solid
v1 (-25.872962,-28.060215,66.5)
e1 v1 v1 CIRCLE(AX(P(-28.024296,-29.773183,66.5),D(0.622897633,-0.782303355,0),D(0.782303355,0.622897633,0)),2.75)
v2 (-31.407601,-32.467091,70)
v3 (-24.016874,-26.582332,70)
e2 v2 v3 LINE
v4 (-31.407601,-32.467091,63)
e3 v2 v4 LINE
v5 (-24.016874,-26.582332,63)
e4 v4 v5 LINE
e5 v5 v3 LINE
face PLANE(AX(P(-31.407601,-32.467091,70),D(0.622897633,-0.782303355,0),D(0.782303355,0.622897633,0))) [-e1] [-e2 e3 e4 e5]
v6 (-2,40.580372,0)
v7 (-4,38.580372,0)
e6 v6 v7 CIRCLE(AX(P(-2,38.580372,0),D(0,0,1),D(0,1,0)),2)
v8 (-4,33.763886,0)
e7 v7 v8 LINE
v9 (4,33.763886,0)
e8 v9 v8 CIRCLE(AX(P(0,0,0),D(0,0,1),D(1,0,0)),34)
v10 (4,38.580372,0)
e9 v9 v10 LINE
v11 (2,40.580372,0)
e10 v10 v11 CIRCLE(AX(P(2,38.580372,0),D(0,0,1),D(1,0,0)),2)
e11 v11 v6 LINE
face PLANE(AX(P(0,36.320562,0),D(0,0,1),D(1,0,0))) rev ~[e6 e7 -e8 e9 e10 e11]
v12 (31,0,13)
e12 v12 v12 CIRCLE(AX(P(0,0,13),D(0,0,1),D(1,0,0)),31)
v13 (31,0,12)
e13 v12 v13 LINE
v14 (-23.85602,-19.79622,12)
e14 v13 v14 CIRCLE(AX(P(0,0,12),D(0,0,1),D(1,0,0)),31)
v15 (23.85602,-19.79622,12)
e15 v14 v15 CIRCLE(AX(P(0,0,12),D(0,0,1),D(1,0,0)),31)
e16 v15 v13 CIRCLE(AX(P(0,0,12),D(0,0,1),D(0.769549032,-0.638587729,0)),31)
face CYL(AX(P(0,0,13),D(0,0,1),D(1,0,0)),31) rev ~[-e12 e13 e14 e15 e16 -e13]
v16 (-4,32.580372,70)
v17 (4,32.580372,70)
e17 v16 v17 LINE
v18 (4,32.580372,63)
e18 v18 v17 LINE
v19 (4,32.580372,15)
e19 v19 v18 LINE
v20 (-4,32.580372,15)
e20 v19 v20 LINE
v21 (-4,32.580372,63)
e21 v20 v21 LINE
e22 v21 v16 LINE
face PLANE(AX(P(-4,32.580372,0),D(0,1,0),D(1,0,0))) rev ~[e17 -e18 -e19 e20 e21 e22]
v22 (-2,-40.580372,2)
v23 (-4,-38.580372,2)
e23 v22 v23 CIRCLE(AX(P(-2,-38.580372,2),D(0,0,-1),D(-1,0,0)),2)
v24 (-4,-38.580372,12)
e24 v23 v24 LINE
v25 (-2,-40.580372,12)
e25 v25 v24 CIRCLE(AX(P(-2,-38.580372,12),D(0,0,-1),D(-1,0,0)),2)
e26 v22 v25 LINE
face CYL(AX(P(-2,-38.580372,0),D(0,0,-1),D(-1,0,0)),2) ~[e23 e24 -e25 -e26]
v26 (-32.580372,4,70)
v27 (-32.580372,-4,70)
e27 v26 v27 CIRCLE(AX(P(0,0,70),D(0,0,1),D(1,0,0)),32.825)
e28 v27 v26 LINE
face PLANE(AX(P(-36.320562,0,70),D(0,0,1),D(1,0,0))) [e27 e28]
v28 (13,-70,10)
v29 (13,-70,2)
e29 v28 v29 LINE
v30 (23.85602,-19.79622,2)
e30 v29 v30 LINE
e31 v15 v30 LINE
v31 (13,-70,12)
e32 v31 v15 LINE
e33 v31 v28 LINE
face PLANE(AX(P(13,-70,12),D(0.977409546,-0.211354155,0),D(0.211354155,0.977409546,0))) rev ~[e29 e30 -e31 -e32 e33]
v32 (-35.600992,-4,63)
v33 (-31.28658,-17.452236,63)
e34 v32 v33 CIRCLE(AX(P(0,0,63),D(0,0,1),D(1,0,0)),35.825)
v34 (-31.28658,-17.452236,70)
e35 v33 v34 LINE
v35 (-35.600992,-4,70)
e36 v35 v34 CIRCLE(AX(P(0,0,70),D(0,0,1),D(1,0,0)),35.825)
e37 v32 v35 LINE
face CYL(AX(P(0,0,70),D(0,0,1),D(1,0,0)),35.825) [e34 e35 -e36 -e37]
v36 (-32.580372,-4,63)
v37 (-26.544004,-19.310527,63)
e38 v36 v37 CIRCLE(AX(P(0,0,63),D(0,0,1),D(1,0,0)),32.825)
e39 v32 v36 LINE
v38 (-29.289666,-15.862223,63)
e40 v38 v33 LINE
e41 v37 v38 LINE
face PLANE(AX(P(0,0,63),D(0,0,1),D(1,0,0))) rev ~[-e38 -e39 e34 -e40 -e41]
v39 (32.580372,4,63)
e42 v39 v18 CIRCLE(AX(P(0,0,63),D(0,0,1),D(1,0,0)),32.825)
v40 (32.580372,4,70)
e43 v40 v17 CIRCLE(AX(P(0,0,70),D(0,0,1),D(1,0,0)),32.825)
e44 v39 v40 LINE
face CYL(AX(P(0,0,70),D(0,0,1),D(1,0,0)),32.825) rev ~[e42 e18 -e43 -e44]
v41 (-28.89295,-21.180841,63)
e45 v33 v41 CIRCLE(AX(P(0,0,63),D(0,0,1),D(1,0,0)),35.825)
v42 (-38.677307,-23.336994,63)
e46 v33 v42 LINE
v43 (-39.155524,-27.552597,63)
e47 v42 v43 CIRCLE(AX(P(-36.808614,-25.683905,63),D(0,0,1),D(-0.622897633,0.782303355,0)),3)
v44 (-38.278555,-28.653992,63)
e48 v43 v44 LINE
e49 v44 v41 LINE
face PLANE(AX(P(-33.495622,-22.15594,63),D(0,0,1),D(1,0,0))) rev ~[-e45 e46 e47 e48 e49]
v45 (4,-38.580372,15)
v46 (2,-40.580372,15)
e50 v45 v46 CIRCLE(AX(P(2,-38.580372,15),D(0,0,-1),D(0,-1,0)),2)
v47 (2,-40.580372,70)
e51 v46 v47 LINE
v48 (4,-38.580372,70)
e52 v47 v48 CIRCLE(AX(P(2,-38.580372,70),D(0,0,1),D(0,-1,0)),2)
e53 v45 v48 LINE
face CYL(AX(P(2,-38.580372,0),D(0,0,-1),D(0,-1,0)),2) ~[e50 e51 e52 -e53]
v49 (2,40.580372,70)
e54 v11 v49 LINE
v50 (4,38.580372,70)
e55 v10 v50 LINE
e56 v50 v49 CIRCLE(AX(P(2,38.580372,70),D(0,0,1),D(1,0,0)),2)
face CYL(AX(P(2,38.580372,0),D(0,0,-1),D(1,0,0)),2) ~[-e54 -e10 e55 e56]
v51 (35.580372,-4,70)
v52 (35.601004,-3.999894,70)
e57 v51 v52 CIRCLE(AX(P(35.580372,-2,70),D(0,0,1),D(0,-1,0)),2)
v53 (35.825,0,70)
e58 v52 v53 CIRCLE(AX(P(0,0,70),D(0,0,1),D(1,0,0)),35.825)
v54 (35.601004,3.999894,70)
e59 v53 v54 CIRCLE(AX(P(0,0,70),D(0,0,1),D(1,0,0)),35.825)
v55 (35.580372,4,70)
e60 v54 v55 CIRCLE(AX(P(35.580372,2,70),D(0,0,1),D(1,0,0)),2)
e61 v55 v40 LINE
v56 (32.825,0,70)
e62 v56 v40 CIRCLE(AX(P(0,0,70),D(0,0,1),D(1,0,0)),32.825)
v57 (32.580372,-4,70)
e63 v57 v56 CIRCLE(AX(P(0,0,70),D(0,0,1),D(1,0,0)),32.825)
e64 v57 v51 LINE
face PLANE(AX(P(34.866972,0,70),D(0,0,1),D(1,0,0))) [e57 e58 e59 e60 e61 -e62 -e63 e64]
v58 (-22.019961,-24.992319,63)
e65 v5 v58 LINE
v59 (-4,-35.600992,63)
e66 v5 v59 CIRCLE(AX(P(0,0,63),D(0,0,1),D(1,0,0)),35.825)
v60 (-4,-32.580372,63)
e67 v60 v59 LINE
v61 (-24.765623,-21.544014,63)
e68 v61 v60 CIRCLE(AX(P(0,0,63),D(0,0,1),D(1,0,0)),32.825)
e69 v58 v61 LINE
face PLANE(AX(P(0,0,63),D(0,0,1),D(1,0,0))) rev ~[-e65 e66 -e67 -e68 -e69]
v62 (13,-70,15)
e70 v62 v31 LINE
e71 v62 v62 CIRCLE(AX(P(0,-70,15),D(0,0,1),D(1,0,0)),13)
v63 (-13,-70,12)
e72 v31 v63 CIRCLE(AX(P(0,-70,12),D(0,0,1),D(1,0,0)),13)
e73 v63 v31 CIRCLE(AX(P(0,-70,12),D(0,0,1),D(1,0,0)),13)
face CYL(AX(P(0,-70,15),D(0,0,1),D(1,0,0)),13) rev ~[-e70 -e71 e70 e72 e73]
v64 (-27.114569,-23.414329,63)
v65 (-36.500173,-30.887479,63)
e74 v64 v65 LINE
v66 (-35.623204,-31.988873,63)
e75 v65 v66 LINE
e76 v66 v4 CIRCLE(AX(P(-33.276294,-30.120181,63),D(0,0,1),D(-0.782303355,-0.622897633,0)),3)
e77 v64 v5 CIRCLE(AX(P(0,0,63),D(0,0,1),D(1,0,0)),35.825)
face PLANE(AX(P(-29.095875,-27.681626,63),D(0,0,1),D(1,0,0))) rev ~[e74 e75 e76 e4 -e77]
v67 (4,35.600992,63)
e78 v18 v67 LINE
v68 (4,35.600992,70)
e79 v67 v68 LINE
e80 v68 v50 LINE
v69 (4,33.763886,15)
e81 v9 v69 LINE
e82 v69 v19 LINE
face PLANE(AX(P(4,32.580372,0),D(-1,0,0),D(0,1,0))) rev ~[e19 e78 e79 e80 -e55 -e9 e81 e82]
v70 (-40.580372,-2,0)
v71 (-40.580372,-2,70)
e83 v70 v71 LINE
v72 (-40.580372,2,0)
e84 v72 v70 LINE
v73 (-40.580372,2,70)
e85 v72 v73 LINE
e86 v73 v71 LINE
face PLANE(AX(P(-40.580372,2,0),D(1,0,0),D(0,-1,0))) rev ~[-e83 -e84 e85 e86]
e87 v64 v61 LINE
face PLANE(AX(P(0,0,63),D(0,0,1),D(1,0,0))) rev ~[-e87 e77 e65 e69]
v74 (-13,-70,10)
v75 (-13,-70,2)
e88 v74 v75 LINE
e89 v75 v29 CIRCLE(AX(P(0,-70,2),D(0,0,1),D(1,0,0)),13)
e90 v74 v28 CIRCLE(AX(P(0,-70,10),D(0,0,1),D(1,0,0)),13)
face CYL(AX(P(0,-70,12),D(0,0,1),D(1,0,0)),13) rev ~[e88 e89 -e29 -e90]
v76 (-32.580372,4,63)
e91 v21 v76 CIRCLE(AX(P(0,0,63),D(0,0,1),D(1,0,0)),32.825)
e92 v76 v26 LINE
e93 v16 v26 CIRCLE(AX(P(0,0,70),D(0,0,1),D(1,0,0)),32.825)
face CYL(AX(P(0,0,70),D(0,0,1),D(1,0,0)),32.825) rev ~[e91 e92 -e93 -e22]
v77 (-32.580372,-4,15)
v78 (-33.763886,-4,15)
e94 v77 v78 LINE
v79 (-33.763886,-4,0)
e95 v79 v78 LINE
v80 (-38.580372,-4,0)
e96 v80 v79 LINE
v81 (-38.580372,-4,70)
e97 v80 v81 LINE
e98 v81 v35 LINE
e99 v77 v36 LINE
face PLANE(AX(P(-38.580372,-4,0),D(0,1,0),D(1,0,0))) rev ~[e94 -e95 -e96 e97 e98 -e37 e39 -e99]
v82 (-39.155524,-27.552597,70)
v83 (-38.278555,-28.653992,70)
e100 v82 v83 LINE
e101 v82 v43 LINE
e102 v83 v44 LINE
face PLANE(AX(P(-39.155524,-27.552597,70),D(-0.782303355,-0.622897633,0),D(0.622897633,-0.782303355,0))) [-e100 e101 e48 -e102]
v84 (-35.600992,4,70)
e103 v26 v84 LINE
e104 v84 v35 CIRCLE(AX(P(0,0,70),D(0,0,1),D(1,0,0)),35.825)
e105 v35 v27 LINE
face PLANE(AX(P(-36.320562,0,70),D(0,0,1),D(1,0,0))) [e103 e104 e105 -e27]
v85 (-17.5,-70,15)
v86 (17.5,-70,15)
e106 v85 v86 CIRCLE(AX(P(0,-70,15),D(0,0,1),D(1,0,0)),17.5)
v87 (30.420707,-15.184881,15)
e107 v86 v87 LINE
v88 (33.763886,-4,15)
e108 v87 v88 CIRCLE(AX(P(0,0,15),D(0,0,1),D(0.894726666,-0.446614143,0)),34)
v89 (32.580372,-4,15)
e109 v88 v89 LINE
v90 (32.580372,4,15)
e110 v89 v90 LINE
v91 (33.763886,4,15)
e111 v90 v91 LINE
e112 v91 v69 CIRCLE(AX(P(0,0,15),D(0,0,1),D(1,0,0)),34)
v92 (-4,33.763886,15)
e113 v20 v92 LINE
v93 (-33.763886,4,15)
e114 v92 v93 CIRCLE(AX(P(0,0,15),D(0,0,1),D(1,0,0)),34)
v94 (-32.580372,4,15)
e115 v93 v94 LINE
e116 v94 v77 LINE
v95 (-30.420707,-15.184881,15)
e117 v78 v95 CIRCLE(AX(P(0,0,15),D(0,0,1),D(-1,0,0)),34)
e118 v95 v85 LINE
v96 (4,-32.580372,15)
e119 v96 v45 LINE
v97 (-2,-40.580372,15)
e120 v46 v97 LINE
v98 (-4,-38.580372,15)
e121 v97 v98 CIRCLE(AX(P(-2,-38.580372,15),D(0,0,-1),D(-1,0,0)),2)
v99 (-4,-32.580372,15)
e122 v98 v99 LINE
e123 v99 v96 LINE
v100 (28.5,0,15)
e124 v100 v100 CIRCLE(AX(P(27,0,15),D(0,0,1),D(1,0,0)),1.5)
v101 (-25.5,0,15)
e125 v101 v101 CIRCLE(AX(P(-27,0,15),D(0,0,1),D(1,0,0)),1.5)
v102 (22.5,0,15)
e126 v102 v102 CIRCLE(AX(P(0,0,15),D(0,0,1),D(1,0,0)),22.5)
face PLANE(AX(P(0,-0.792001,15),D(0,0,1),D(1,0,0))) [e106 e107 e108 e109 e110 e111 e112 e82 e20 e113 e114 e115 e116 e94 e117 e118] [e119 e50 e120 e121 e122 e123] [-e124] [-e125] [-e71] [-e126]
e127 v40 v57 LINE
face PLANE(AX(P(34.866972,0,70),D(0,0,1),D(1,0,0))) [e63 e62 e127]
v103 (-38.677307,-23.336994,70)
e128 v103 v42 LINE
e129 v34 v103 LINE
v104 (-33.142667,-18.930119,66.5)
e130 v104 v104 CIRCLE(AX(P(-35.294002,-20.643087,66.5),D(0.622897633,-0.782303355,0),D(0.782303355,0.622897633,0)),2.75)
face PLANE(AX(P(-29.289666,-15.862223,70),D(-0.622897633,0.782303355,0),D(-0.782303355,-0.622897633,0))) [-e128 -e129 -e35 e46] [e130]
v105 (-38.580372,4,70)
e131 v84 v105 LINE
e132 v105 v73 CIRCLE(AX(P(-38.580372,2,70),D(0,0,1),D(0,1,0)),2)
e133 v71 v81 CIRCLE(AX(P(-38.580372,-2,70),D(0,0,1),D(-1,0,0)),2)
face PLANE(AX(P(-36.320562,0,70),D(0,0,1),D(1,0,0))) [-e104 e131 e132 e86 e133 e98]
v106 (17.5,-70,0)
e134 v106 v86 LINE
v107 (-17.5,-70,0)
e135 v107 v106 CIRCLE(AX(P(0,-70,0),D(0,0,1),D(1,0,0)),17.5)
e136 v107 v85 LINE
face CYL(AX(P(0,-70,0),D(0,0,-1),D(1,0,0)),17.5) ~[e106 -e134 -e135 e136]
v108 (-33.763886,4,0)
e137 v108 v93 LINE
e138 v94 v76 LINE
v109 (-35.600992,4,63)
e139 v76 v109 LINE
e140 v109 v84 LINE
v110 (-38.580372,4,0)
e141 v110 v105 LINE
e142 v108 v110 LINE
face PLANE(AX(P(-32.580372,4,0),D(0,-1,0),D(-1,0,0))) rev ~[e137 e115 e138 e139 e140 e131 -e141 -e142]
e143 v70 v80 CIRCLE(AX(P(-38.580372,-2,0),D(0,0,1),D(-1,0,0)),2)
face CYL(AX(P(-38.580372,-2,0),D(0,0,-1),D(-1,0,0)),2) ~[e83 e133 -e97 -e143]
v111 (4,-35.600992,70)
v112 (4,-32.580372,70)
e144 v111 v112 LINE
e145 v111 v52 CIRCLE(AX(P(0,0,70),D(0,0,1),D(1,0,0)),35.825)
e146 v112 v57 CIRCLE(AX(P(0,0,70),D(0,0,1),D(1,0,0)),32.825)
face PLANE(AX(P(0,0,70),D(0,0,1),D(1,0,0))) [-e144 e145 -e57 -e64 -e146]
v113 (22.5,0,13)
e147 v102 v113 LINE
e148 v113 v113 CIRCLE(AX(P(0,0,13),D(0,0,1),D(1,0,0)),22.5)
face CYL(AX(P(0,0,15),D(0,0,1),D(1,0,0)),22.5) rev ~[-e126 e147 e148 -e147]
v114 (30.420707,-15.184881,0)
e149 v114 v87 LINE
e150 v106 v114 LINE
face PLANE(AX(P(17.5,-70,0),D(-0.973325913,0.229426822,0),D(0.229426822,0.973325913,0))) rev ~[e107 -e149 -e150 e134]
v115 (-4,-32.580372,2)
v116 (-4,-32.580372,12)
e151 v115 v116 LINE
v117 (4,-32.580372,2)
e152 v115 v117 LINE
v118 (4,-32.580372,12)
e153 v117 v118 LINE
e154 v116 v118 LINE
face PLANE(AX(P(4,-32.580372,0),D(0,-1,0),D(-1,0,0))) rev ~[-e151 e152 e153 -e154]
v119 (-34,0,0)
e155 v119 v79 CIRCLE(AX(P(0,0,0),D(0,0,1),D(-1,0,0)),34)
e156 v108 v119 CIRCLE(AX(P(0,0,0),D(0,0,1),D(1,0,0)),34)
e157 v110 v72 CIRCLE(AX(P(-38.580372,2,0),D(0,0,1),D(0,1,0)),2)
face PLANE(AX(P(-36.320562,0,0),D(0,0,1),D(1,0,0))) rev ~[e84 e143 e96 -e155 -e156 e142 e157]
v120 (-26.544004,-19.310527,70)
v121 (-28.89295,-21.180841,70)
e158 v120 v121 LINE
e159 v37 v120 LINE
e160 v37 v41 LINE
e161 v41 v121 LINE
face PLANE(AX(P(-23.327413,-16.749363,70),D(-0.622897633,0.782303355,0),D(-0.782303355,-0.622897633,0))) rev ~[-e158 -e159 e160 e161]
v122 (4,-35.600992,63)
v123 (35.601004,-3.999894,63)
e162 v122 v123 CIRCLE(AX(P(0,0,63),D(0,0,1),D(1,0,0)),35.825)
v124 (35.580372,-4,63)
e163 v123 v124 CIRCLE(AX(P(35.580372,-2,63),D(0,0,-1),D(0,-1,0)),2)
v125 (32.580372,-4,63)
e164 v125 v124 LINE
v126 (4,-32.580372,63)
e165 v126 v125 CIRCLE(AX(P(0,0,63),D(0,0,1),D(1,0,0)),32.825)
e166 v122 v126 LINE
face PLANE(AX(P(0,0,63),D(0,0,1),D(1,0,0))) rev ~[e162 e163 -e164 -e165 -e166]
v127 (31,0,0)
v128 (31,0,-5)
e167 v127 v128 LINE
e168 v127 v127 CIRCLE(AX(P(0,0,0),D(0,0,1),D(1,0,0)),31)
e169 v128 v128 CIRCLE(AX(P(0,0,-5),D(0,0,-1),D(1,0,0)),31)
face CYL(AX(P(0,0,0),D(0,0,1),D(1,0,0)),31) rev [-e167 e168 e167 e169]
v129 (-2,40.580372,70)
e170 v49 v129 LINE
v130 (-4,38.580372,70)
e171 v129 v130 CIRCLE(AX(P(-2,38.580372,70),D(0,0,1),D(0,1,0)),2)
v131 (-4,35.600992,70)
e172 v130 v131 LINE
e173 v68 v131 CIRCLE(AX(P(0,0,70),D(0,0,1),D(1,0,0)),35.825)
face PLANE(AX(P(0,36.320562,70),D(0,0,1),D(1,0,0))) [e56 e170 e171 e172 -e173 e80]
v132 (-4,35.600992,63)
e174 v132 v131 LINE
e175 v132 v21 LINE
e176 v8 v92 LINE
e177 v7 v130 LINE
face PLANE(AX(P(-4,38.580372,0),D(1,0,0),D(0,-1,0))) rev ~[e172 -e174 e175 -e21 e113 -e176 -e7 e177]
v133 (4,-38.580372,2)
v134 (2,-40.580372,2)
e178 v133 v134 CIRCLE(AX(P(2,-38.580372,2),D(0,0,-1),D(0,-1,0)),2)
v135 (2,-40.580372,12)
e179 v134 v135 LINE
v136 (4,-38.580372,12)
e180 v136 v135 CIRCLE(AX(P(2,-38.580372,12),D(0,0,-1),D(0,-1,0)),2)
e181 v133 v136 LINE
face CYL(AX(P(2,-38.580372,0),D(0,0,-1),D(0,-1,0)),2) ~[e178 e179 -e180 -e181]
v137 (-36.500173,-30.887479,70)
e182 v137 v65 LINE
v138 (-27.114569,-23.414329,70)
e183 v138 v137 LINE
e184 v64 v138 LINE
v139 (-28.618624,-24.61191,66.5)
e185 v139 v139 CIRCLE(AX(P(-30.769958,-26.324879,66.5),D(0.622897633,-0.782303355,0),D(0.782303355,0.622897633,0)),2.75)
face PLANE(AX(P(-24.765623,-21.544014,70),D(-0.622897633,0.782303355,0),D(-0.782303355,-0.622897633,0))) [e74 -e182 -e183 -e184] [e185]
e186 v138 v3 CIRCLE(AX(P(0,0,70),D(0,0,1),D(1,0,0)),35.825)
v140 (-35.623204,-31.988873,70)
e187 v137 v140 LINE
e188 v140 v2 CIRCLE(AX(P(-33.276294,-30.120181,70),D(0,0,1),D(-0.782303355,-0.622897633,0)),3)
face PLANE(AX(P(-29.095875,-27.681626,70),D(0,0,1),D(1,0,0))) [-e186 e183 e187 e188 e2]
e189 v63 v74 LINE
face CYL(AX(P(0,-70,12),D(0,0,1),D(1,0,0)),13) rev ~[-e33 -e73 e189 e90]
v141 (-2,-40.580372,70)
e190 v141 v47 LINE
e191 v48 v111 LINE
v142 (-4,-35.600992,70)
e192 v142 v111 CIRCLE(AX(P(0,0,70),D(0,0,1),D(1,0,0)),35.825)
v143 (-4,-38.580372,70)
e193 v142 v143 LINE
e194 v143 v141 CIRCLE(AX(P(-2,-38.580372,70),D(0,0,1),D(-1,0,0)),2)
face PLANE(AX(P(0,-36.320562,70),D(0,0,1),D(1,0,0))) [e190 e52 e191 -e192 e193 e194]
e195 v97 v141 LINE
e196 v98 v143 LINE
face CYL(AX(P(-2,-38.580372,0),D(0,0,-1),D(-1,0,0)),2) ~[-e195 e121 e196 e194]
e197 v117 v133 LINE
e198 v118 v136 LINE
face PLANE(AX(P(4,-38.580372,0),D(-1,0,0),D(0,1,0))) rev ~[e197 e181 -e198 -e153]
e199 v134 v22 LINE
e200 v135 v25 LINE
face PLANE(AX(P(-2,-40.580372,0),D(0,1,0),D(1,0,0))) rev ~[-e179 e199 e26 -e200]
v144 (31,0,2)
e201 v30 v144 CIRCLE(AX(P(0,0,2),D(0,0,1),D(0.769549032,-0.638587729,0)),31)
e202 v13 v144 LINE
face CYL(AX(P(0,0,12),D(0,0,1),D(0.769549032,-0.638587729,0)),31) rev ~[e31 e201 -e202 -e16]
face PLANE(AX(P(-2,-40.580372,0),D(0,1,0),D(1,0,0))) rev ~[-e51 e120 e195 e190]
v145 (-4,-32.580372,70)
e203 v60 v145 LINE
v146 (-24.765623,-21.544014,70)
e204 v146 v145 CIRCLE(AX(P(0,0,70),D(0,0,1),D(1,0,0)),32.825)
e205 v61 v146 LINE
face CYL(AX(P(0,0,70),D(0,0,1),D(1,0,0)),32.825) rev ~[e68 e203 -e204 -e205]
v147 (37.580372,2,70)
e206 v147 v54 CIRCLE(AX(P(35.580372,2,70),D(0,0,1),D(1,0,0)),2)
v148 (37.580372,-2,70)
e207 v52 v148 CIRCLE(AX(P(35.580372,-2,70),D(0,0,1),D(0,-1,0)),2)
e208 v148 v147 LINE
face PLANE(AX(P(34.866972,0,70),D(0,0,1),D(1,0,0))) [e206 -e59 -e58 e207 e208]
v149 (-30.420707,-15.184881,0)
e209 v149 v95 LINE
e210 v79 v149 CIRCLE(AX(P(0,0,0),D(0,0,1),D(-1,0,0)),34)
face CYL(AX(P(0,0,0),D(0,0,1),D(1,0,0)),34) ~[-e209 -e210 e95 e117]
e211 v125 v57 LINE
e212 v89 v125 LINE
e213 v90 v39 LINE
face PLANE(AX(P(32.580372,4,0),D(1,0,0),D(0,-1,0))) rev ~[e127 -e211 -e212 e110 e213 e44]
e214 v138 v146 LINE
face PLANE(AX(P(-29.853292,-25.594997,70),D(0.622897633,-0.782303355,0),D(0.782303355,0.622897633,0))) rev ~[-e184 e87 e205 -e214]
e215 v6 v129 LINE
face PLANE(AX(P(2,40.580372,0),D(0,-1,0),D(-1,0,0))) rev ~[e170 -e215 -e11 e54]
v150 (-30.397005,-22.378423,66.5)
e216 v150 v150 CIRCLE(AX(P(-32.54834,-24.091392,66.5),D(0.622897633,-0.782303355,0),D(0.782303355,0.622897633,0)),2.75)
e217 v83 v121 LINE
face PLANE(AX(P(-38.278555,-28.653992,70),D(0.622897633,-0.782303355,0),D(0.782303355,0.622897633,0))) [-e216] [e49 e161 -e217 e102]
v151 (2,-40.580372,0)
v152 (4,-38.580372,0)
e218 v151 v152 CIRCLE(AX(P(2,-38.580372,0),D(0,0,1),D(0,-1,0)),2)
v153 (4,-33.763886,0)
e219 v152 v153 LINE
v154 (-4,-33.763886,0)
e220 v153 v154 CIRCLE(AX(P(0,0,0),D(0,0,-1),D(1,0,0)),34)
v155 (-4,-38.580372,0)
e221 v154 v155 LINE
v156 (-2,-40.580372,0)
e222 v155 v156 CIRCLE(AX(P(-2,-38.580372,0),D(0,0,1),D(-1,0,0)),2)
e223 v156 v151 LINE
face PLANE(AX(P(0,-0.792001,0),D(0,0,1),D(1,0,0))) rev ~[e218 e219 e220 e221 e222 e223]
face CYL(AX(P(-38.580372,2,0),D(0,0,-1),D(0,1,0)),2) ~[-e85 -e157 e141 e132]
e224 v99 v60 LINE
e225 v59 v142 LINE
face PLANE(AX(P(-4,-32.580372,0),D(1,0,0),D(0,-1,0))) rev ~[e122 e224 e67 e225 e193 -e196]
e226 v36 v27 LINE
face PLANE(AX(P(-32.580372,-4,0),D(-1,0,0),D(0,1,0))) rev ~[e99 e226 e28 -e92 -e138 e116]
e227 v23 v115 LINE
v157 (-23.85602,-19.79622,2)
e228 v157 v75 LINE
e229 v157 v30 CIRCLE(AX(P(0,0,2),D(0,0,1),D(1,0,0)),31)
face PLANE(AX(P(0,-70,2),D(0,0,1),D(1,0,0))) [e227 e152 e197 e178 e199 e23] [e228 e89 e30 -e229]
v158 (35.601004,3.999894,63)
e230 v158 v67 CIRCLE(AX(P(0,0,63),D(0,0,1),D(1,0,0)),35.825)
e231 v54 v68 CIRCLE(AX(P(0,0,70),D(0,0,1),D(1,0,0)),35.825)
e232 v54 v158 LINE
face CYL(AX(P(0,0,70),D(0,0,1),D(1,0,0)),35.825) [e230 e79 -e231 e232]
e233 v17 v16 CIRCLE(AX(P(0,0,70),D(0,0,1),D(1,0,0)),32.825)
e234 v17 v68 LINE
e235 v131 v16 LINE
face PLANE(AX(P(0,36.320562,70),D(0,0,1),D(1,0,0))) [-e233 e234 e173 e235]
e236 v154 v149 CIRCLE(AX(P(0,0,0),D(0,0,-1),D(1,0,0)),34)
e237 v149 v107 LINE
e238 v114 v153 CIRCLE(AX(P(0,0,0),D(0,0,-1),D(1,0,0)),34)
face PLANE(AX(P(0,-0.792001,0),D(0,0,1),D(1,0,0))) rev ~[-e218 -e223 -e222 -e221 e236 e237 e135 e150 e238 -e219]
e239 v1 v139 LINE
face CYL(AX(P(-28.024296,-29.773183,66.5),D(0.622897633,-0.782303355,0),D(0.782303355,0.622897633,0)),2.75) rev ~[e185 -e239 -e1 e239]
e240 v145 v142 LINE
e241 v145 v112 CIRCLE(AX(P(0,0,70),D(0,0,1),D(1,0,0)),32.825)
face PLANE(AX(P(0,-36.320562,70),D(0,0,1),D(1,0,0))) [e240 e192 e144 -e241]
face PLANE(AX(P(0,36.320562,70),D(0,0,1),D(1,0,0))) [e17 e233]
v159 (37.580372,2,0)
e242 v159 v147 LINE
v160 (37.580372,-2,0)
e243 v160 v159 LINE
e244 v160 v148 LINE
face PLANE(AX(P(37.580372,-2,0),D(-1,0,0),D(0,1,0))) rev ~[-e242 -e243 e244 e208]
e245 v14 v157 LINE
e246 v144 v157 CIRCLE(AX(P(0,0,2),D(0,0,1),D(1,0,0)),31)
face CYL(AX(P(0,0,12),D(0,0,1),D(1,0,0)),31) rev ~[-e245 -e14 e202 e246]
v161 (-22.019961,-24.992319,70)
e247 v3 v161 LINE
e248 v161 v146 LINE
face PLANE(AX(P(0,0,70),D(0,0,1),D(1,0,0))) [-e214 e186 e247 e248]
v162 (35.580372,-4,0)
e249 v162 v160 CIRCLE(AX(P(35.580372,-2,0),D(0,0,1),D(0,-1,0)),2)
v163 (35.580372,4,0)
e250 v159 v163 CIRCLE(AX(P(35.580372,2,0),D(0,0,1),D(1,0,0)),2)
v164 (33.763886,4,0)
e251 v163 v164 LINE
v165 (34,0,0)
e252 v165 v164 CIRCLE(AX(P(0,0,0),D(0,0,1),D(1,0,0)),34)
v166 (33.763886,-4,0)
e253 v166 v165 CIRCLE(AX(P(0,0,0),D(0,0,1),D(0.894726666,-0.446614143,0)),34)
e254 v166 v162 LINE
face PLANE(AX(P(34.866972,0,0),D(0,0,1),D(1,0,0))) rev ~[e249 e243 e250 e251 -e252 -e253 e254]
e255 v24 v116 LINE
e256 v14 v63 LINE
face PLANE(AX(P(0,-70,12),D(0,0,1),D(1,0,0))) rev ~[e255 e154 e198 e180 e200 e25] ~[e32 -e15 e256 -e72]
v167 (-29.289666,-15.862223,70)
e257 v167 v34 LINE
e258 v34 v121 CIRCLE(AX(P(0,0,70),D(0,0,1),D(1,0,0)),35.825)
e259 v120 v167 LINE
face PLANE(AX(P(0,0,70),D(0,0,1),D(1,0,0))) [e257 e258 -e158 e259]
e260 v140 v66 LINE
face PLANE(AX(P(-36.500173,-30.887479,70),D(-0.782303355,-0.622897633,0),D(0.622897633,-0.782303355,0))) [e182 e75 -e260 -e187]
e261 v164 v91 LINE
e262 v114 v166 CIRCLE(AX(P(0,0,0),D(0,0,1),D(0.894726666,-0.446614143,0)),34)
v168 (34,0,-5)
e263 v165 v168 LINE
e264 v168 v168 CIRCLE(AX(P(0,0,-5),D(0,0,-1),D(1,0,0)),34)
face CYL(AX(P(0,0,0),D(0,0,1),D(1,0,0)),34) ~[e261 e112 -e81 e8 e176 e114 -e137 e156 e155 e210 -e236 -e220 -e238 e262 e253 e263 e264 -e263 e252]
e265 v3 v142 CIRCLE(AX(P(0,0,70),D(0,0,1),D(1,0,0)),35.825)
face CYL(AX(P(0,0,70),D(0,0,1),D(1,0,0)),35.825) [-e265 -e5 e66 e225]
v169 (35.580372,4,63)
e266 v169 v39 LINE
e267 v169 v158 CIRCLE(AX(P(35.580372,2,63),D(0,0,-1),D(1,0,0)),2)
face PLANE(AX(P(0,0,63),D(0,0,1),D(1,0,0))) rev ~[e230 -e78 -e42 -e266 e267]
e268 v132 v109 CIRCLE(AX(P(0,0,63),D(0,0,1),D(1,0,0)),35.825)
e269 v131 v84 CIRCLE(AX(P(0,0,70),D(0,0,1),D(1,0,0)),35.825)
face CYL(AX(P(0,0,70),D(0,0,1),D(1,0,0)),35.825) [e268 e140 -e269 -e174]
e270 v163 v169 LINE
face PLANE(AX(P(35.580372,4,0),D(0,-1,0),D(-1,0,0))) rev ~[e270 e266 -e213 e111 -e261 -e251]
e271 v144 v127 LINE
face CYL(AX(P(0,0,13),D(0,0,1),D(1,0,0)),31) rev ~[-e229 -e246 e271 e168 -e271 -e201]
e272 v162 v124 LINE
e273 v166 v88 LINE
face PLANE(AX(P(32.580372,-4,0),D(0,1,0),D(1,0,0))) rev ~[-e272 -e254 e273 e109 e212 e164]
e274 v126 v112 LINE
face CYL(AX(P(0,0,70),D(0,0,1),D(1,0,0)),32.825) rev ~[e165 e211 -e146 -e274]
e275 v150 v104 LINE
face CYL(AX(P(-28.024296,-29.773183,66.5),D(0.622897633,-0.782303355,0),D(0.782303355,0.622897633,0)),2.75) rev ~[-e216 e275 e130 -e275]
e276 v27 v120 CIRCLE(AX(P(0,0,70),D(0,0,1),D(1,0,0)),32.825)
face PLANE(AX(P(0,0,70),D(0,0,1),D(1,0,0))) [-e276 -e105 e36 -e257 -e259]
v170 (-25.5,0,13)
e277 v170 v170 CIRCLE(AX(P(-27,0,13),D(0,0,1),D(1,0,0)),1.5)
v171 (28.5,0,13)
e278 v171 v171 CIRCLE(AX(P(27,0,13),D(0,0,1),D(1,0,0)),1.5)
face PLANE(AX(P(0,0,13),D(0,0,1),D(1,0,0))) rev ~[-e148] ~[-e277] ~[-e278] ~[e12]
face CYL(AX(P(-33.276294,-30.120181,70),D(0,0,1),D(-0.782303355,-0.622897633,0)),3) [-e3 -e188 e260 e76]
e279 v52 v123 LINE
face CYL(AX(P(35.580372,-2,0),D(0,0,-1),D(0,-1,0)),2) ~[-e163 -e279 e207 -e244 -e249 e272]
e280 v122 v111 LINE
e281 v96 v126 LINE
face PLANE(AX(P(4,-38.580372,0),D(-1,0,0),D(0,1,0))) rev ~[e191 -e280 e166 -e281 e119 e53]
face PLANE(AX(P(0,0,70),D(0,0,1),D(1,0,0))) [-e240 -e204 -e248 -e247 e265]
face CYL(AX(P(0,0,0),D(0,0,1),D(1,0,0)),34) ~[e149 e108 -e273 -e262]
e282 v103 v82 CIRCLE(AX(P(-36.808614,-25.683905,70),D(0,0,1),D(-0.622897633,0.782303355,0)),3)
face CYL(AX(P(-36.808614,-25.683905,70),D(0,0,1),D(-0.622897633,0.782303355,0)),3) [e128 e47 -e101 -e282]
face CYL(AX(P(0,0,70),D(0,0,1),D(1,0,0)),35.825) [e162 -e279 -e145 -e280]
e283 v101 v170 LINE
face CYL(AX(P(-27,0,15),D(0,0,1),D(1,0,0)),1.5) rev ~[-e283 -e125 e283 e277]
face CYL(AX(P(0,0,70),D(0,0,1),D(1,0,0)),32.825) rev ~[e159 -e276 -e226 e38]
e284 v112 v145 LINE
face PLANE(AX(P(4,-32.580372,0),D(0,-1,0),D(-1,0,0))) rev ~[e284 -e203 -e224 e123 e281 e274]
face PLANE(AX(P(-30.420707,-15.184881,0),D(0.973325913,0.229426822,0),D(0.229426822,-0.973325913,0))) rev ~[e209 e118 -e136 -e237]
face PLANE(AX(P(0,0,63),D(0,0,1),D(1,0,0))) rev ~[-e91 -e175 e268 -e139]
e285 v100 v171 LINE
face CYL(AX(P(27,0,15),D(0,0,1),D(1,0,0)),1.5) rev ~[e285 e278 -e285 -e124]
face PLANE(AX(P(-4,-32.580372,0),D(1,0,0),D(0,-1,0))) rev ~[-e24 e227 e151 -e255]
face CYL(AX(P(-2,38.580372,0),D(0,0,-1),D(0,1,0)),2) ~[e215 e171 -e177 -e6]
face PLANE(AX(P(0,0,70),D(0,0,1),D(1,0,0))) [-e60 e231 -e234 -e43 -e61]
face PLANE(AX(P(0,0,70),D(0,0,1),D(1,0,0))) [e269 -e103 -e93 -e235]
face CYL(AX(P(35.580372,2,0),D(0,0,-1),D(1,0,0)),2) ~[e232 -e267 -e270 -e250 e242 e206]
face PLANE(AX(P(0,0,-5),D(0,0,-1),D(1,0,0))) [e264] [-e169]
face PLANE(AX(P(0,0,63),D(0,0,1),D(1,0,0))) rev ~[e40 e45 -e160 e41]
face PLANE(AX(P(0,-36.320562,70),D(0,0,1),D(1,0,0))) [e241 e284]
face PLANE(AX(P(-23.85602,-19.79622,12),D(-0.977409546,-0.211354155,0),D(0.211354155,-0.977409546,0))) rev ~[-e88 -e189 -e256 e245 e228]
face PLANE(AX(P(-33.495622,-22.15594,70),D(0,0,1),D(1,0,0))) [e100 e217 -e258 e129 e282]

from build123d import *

# Parameters (mm, degrees)
F1_DEPTH  = 15
F3_START  = -2
F2_R      = 31
F3_DEPTH  = 19.9
F5_START  = -3
F5_DEPTH  = 10
F6_R      = 22.5
F6_R_2    = 13
F7_DEPTH  = 5
F10_R     = 34
F10_R_2   = 31
F11_DEPTH = 5
F12_R     = 1.5
F13_DEPTH = 5
F15_DEPTH = 70
F16_R     = 35.825
F16_R_2   = 32.825
F17_DEPTH = 7
F19_DEPTH = 9.7
F21_DEPTH = 7
F22_R     = 2.75
F23_DEPTH = 14.84


# Not quite as in the source:
# - the program builds the solid bodies; features that only make, move or delete a surface that nothing else refers to are left out


with BuildPart() as f1:
    # F0 (on Top) → F1 (new body)
    with BuildSketch(Plane.XY):
        with BuildLine():
            Line((30.4207066557, -15.1848808546), (34, 0))
            ThreePointArc((34, 0), (0, 34), (-34, 0))
            Line((-34, 0), (-30.4207066557, -15.1848808546))
            ThreePointArc((-30.4207066557, -15.1848808546), (0, -34), (30.4207066557, -15.1848808546))
        make_face()
        with BuildLine():
            ThreePointArc((30.4207066557, -15.1848808546), (33.0930810465, -7.8005119609), (34, 0))
            Line((34, 0), (30.4207066557, -15.1848808546))
        make_face()
        with BuildLine():
            Line((-30.4207066557, -15.1848808546), (-34, 0))
            ThreePointArc((-34, 0), (-33.0930810465, -7.8005119609), (-30.4207066557, -15.1848808546))
        make_face()
        with BuildLine():
            Line((17.5, -70), (30.4207066557, -15.1848808546))
            ThreePointArc((30.4207066557, -15.1848808546), (0, -34), (-30.4207066557, -15.1848808546))
            Line((-30.4207066557, -15.1848808546), (-17.5, -70))
            ThreePointArc((-17.5, -70), (0, -52.5), (17.5, -70))
        make_face()
        with BuildLine():
            ThreePointArc((-17.5, -70), (0, -87.5), (17.5, -70))
            ThreePointArc((17.5, -70), (0, -52.5), (-17.5, -70))
        make_face()
    extrude(amount=F1_DEPTH)

    # F2 (on face) → F3 (cut)
    with BuildSketch(Plane.XY.offset(15).offset(F3_START)):
        Circle(F2_R)
    extrude(amount=-F3_DEPTH, mode=Mode.SUBTRACT)

    # F4 (on face) → F5 (cut)
    with BuildSketch(Plane.XY.offset(15).offset(F5_START)):
        with BuildLine():
            ThreePointArc((-13, -70), (0, -83), (13, -70))
            ThreePointArc((13, -70), (0, -57), (-13, -70))
        make_face()
        with BuildLine():
            ThreePointArc((-13, -70), (0, -57), (13, -70))
            Line((13, -70), (23.8560199829, -19.7962196031))
            ThreePointArc((23.8560199829, -19.7962196031), (0, -31), (-23.8560199829, -19.7962196031))
            Line((-23.8560199829, -19.7962196031), (-13, -70))
        make_face()
        with BuildLine():
            ThreePointArc((-23.8560199829, -19.7962196031), (0, -31), (23.8560199829, -19.7962196031))
            ThreePointArc((23.8560199829, -19.7962196031), (29.1593605852, -10.5229126322), (31, 0))
            ThreePointArc((31, 0), (-10.5229126322, 29.1593605852), (-23.8560199829, -19.7962196031))
        make_face()
    extrude(amount=-F5_DEPTH, mode=Mode.SUBTRACT)

    # F6 (on face) → F7 (cut)
    with BuildSketch(Plane.XY.offset(15)):
        Circle(F6_R)
        with Locations((0, -70)):
            Circle(F6_R_2)
    extrude(amount=-F7_DEPTH, mode=Mode.SUBTRACT)

    # F10 (on face) → F11 (join)
    with BuildSketch(Plane(origin=(0, 0, 0), x_dir=(1, 0, 0), z_dir=(0, 0, -1))):
        Circle(F10_R)
        Circle(F10_R_2, mode=Mode.SUBTRACT)
    extrude(amount=F11_DEPTH)

    # F12 (on face) → F13 (cut)
    with BuildSketch(Plane.XY.offset(15)):
        with Locations((-27, 0)):
            Circle(F12_R)
        with Locations((27, 0)):
            Circle(F12_R)
    extrude(amount=-F13_DEPTH, mode=Mode.SUBTRACT)

    # F14 (on Top) → F15 (join)
    with BuildSketch(Plane.XY):
        with BuildLine():
            ThreePointArc((-40.580371775, -2), (-39.9945853374, -3.4142135624), (-38.580371775, -4))
            Line((-38.580371775, -4), (-32.580371775, -4))
            Line((-32.580371775, -4), (-32.580371775, 4))
            Line((-32.580371775, 4), (-38.580371775, 4))
            ThreePointArc((-38.580371775, 4), (-39.9945853374, 3.4142135624), (-40.580371775, 2))
            Line((-40.580371775, 2), (-40.580371775, -2))
        make_face()
        with BuildLine():
            Line((-4, 38.580371775), (-4, 32.580371775))
            Line((-4, 32.580371775), (4, 32.580371775))
            Line((4, 32.580371775), (4, 38.580371775))
            ThreePointArc((4, 38.580371775), (3.4142135624, 39.9945853374), (2, 40.580371775))
            Line((2, 40.580371775), (-2, 40.580371775))
            ThreePointArc((-2, 40.580371775), (-3.4142135624, 39.9945853374), (-4, 38.580371775))
        make_face()
        with BuildLine():
            Line((32.580371775, 4), (32.580371775, -4))
            Line((32.580371775, -4), (35.580371775, -4))
            ThreePointArc((35.580371775, -4), (36.9945853374, -3.4142135624), (37.580371775, -2))
            Line((37.580371775, -2), (37.580371775, 2))
            ThreePointArc((37.580371775, 2), (36.9945853374, 3.4142135624), (35.580371775, 4))
            Line((35.580371775, 4), (32.580371775, 4))
        make_face()
        with BuildLine():
            Line((4, -32.580371775), (-4, -32.580371775))
            Line((-4, -32.580371775), (-4, -38.580371775))
            ThreePointArc((-4, -38.580371775), (-3.4142135624, -39.9945853374), (-2, -40.580371775))
            Line((-2, -40.580371775), (2, -40.580371775))
            ThreePointArc((2, -40.580371775), (3.4142135624, -39.9945853374), (4, -38.580371775))
            Line((4, -38.580371775), (4, -32.580371775))
        make_face()
    extrude(amount=F15_DEPTH)

    # F16 (on face) → F17 (join)
    with BuildSketch(Plane.XY.offset(70)):
        Circle(F16_R)
        Circle(F16_R_2, mode=Mode.SUBTRACT)
    extrude(amount=-F17_DEPTH)

    # F18 (on face) → F19 (cut)
    with BuildSketch(Plane.XY.offset(70)):
        Polygon((-23.3274125101, -16.7493631263), (-31.6316734562, -23.3615097559), (-29.853291891, -25.5949969131), (-21.5490309449, -18.9828502835), align=None)
    extrude(amount=-F19_DEPTH, mode=Mode.SUBTRACT)

    # F20 (on face) → F21 (join)
    with BuildSketch(Plane.XY.offset(70)):
        with BuildLine():
            Line((-38.2785545197, -28.6539918331), (-26.5440042016, -19.3105273347))
            Line((-26.5440042016, -19.3105273347), (-29.2896663374, -15.8622228547))
            Line((-29.2896663374, -15.8622228547), (-38.6773065919, -23.3369944533))
            ThreePointArc((-38.6773065919, -23.3369944533), (-39.7894951343, -25.3457539175), (-39.1555237558, -27.5525974166))
            Line((-39.1555237558, -27.5525974166), (-38.2785545197, -28.6539918331))
        make_face()
        with BuildLine():
            Line((-22.0199605007, -24.9923189719), (-24.7656226365, -21.5440144919))
            Line((-24.7656226365, -21.5440144919), (-36.5001729546, -30.8874789902))
            Line((-36.5001729546, -30.8874789902), (-35.6232037185, -31.9888734067))
            ThreePointArc((-35.6232037185, -31.9888734067), (-33.6144442544, -33.1010619491), (-31.4076007552, -32.4670905706))
            Line((-31.4076007552, -32.4670905706), (-22.0199605007, -24.9923189719))
        make_face()
    extrude(amount=-F21_DEPTH)

    # F22 (on face) → F23 (cut)
    with BuildSketch(Plane(origin=(3.6348529183, -4.5650480586, 0), x_dir=(0.7823033545, 0.6228976332, 0), z_dir=(0.6228976332, -0.7823033545, 0))):
        with Locations((-40.469146122, 66.5)):
            Circle(F22_R)
    extrude(amount=-F23_DEPTH, mode=Mode.SUBTRACT)


solid = f1.part
